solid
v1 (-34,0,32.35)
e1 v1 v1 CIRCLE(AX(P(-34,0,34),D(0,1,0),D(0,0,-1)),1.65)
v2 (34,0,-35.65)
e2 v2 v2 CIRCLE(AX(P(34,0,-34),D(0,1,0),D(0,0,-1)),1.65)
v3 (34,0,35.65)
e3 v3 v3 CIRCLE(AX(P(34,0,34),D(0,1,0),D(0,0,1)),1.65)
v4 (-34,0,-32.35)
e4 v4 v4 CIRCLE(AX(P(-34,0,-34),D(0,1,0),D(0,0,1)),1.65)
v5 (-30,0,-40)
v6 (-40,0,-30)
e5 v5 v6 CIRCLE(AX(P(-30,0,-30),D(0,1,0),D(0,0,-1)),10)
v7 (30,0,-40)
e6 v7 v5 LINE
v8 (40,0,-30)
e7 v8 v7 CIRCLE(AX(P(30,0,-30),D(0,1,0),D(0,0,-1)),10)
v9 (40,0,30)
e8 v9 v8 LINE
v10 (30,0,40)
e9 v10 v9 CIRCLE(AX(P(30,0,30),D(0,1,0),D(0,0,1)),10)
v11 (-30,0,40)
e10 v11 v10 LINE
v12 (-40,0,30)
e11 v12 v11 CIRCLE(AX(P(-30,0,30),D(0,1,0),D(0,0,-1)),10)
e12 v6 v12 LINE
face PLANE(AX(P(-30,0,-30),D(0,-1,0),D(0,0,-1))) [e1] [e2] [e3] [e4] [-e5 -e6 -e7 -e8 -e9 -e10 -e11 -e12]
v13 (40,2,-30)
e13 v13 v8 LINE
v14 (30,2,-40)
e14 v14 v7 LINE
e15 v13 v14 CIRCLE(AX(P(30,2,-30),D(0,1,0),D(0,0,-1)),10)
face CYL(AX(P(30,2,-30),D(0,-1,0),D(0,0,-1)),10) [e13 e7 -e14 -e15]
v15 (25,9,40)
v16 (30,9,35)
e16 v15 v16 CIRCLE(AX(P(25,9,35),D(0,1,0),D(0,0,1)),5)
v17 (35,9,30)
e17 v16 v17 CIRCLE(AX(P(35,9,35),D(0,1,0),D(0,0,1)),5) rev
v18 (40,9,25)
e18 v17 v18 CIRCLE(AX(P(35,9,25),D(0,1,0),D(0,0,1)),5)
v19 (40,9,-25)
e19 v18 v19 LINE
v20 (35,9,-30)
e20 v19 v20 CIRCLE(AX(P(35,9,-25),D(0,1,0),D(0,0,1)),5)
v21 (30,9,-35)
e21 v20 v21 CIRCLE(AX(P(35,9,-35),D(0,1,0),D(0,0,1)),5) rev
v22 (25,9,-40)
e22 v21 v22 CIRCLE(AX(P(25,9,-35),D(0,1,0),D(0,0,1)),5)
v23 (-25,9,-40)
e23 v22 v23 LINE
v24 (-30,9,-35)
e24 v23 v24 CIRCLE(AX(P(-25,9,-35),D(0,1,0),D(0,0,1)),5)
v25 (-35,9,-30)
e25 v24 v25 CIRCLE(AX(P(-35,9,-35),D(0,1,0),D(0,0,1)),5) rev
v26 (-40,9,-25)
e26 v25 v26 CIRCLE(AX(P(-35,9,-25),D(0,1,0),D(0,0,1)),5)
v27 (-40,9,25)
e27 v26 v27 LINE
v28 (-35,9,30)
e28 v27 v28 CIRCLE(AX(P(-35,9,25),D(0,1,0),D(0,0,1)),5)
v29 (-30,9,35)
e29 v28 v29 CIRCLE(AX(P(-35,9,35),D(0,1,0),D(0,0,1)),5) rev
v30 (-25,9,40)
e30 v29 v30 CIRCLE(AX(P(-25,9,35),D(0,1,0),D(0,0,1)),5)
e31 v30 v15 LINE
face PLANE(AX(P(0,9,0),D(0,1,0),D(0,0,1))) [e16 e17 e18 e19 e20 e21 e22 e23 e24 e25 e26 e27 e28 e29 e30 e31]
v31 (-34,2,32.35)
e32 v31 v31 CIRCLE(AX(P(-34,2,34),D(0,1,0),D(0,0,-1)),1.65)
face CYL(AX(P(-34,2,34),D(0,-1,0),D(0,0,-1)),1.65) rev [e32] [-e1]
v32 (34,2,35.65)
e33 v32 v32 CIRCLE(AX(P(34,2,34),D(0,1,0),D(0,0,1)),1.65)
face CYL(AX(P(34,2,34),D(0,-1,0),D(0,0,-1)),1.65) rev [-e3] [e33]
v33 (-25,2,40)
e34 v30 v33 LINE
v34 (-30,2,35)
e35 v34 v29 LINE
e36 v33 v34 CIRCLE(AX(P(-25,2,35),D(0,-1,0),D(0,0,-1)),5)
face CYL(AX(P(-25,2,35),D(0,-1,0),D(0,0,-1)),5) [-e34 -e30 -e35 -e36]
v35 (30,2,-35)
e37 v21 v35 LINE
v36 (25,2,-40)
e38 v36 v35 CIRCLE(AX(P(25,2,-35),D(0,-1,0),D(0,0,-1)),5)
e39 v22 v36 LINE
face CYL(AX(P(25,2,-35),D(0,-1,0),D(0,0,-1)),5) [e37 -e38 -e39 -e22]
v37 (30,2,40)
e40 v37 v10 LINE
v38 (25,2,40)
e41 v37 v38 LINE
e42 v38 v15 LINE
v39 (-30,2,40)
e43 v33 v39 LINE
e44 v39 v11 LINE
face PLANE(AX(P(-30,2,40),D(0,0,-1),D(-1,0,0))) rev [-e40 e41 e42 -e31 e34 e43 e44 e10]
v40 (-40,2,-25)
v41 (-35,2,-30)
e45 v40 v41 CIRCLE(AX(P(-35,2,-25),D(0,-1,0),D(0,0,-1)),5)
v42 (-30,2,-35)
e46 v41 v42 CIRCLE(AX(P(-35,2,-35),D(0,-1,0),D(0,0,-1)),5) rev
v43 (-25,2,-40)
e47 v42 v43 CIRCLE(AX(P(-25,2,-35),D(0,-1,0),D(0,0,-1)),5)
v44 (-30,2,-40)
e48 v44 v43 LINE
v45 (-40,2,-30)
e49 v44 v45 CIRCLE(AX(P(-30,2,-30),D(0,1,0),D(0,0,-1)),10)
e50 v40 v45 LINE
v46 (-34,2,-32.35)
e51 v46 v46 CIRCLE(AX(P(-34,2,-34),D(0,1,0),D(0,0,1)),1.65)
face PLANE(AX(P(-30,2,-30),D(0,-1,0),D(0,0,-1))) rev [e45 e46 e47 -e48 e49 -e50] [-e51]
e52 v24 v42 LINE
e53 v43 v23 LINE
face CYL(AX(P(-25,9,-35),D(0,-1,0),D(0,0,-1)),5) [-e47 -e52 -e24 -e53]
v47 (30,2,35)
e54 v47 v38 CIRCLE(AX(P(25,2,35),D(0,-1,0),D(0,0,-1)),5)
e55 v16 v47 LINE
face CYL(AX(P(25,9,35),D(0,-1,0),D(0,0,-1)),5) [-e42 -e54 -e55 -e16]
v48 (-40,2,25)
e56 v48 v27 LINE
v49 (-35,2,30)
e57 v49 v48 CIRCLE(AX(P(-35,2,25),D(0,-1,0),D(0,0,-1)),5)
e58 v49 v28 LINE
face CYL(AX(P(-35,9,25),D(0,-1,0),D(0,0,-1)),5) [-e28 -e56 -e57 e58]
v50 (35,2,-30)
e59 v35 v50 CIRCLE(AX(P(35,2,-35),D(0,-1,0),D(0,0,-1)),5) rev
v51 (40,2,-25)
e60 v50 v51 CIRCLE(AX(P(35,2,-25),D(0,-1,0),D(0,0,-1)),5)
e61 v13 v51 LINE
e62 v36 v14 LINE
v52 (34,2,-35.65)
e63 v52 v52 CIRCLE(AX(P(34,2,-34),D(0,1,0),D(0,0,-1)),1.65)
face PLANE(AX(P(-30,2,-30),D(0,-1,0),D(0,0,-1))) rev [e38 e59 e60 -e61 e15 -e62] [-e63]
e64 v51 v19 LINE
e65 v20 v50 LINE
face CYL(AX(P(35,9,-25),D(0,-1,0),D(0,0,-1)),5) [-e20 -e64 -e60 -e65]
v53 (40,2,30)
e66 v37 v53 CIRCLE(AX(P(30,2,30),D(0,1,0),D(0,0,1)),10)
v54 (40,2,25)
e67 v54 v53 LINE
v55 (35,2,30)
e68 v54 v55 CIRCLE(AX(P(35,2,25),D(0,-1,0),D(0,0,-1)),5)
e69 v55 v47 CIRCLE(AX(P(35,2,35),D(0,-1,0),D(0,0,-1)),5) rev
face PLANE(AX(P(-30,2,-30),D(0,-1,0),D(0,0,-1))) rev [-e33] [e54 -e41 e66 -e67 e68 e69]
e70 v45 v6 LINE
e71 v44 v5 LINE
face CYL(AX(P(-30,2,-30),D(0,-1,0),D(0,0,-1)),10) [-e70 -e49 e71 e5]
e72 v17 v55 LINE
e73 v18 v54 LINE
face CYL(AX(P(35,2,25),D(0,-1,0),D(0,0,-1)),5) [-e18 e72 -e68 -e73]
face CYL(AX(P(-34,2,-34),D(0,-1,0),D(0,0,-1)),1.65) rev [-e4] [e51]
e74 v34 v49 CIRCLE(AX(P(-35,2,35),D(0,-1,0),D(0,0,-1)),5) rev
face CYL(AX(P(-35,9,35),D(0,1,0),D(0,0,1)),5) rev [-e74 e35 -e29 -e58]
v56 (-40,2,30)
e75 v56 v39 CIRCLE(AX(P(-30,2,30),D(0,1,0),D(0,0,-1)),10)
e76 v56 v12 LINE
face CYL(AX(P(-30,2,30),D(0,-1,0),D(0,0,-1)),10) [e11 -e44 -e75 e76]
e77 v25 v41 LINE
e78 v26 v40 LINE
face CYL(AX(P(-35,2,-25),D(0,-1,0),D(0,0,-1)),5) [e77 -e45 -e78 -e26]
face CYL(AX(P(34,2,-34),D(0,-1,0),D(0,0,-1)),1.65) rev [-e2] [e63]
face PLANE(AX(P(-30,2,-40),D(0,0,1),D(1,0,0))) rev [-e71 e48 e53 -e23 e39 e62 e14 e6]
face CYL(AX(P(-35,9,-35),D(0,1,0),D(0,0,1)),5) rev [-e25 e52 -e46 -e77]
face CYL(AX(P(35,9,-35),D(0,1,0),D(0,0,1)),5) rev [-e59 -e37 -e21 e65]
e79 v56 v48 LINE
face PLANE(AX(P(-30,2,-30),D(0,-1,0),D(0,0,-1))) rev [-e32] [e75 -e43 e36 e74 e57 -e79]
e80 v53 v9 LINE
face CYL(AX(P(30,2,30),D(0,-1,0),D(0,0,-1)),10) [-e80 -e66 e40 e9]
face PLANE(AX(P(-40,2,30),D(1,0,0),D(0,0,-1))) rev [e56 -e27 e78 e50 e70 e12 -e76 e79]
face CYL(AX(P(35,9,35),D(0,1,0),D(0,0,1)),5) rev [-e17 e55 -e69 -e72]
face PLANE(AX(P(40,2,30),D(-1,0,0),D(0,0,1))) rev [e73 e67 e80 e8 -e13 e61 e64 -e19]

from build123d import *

# Parameters (mm, degrees)
SKETCH_1_R      = 1.65
EXTRUDE_1_DEPTH = 2
EXTRUDE_2_DEPTH = 7
FILLET_1_R      = 5


with BuildPart() as part:
    # 草图1 → 凸台-拉伸1 (new body)
    with BuildSketch(Plane(origin=(0, 0, 0), x_dir=(1, 0, 0), z_dir=(0, 1, 0))):
        with BuildLine():
            Line((-30, -40), (30, -40))
            ThreePointArc((30, -40), (37.071067812, -37.071067812), (40, -30))
            Line((40, -30), (40, 30))
            ThreePointArc((40, 30), (37.071067812, 37.071067812), (30, 40))
            Line((30, 40), (-30, 40))
            ThreePointArc((-30, 40), (-37.071067812, 37.071067812), (-40, 30))
            Line((-40, 30), (-40, -30))
            ThreePointArc((-40, -30), (-37.071067812, -37.071067812), (-30, -40))
        make_face()
        with Locations(Location((-34, 34, 0), (0, 0, 270))):
            Circle(SKETCH_1_R, mode=Mode.SUBTRACT)
        with Locations(Location((-34, -34, 0), (0, 0, 90))):
            Circle(SKETCH_1_R, mode=Mode.SUBTRACT)
        with Locations(Location((34, 34, 0), (0, 0, 90))):
            Circle(SKETCH_1_R, mode=Mode.SUBTRACT)
        with Locations(Location((34, -34, 0), (0, 0, 270))):
            Circle(SKETCH_1_R, mode=Mode.SUBTRACT)
    extrude(amount=EXTRUDE_1_DEPTH)

    # 草图2 → 凸台-拉伸2 (add)
    with BuildSketch(Plane(origin=(0, 2, 0), x_dir=(1, 0, 0), z_dir=(0, 1, 0))):
        Polygon((-30, 40), (-30, 30), (-40, 30), (-40, -30), (-30, -30), (-30, -40), (30, -40), (30, -30), (40, -30), (40, 30), (30, 30), (30, 40), align=None)
    extrude(amount=EXTRUDE_2_DEPTH)

    # 圆角1
    fillet_1_edges = [part.edges().sort_by_distance(p)[0] for p in [
        (-40, 5.5, -30),
        (-30, 5.5, -30),
        (-30, 5.5, -40),
        (30, 5.5, -40),
        (30, 5.5, -30),
        (40, 5.5, -30),
        (40, 5.5, 30),
        (30, 5.5, 30),
        (30, 5.5, 40),
        (-40, 5.5, 30),
        (-30, 5.5, 30),
        (-30, 5.5, 40),
    ]]
    fillet(fillet_1_edges, radius=FILLET_1_R - 0.0001)  # a hair under: the kernel refuses the full size


solid = part.part
